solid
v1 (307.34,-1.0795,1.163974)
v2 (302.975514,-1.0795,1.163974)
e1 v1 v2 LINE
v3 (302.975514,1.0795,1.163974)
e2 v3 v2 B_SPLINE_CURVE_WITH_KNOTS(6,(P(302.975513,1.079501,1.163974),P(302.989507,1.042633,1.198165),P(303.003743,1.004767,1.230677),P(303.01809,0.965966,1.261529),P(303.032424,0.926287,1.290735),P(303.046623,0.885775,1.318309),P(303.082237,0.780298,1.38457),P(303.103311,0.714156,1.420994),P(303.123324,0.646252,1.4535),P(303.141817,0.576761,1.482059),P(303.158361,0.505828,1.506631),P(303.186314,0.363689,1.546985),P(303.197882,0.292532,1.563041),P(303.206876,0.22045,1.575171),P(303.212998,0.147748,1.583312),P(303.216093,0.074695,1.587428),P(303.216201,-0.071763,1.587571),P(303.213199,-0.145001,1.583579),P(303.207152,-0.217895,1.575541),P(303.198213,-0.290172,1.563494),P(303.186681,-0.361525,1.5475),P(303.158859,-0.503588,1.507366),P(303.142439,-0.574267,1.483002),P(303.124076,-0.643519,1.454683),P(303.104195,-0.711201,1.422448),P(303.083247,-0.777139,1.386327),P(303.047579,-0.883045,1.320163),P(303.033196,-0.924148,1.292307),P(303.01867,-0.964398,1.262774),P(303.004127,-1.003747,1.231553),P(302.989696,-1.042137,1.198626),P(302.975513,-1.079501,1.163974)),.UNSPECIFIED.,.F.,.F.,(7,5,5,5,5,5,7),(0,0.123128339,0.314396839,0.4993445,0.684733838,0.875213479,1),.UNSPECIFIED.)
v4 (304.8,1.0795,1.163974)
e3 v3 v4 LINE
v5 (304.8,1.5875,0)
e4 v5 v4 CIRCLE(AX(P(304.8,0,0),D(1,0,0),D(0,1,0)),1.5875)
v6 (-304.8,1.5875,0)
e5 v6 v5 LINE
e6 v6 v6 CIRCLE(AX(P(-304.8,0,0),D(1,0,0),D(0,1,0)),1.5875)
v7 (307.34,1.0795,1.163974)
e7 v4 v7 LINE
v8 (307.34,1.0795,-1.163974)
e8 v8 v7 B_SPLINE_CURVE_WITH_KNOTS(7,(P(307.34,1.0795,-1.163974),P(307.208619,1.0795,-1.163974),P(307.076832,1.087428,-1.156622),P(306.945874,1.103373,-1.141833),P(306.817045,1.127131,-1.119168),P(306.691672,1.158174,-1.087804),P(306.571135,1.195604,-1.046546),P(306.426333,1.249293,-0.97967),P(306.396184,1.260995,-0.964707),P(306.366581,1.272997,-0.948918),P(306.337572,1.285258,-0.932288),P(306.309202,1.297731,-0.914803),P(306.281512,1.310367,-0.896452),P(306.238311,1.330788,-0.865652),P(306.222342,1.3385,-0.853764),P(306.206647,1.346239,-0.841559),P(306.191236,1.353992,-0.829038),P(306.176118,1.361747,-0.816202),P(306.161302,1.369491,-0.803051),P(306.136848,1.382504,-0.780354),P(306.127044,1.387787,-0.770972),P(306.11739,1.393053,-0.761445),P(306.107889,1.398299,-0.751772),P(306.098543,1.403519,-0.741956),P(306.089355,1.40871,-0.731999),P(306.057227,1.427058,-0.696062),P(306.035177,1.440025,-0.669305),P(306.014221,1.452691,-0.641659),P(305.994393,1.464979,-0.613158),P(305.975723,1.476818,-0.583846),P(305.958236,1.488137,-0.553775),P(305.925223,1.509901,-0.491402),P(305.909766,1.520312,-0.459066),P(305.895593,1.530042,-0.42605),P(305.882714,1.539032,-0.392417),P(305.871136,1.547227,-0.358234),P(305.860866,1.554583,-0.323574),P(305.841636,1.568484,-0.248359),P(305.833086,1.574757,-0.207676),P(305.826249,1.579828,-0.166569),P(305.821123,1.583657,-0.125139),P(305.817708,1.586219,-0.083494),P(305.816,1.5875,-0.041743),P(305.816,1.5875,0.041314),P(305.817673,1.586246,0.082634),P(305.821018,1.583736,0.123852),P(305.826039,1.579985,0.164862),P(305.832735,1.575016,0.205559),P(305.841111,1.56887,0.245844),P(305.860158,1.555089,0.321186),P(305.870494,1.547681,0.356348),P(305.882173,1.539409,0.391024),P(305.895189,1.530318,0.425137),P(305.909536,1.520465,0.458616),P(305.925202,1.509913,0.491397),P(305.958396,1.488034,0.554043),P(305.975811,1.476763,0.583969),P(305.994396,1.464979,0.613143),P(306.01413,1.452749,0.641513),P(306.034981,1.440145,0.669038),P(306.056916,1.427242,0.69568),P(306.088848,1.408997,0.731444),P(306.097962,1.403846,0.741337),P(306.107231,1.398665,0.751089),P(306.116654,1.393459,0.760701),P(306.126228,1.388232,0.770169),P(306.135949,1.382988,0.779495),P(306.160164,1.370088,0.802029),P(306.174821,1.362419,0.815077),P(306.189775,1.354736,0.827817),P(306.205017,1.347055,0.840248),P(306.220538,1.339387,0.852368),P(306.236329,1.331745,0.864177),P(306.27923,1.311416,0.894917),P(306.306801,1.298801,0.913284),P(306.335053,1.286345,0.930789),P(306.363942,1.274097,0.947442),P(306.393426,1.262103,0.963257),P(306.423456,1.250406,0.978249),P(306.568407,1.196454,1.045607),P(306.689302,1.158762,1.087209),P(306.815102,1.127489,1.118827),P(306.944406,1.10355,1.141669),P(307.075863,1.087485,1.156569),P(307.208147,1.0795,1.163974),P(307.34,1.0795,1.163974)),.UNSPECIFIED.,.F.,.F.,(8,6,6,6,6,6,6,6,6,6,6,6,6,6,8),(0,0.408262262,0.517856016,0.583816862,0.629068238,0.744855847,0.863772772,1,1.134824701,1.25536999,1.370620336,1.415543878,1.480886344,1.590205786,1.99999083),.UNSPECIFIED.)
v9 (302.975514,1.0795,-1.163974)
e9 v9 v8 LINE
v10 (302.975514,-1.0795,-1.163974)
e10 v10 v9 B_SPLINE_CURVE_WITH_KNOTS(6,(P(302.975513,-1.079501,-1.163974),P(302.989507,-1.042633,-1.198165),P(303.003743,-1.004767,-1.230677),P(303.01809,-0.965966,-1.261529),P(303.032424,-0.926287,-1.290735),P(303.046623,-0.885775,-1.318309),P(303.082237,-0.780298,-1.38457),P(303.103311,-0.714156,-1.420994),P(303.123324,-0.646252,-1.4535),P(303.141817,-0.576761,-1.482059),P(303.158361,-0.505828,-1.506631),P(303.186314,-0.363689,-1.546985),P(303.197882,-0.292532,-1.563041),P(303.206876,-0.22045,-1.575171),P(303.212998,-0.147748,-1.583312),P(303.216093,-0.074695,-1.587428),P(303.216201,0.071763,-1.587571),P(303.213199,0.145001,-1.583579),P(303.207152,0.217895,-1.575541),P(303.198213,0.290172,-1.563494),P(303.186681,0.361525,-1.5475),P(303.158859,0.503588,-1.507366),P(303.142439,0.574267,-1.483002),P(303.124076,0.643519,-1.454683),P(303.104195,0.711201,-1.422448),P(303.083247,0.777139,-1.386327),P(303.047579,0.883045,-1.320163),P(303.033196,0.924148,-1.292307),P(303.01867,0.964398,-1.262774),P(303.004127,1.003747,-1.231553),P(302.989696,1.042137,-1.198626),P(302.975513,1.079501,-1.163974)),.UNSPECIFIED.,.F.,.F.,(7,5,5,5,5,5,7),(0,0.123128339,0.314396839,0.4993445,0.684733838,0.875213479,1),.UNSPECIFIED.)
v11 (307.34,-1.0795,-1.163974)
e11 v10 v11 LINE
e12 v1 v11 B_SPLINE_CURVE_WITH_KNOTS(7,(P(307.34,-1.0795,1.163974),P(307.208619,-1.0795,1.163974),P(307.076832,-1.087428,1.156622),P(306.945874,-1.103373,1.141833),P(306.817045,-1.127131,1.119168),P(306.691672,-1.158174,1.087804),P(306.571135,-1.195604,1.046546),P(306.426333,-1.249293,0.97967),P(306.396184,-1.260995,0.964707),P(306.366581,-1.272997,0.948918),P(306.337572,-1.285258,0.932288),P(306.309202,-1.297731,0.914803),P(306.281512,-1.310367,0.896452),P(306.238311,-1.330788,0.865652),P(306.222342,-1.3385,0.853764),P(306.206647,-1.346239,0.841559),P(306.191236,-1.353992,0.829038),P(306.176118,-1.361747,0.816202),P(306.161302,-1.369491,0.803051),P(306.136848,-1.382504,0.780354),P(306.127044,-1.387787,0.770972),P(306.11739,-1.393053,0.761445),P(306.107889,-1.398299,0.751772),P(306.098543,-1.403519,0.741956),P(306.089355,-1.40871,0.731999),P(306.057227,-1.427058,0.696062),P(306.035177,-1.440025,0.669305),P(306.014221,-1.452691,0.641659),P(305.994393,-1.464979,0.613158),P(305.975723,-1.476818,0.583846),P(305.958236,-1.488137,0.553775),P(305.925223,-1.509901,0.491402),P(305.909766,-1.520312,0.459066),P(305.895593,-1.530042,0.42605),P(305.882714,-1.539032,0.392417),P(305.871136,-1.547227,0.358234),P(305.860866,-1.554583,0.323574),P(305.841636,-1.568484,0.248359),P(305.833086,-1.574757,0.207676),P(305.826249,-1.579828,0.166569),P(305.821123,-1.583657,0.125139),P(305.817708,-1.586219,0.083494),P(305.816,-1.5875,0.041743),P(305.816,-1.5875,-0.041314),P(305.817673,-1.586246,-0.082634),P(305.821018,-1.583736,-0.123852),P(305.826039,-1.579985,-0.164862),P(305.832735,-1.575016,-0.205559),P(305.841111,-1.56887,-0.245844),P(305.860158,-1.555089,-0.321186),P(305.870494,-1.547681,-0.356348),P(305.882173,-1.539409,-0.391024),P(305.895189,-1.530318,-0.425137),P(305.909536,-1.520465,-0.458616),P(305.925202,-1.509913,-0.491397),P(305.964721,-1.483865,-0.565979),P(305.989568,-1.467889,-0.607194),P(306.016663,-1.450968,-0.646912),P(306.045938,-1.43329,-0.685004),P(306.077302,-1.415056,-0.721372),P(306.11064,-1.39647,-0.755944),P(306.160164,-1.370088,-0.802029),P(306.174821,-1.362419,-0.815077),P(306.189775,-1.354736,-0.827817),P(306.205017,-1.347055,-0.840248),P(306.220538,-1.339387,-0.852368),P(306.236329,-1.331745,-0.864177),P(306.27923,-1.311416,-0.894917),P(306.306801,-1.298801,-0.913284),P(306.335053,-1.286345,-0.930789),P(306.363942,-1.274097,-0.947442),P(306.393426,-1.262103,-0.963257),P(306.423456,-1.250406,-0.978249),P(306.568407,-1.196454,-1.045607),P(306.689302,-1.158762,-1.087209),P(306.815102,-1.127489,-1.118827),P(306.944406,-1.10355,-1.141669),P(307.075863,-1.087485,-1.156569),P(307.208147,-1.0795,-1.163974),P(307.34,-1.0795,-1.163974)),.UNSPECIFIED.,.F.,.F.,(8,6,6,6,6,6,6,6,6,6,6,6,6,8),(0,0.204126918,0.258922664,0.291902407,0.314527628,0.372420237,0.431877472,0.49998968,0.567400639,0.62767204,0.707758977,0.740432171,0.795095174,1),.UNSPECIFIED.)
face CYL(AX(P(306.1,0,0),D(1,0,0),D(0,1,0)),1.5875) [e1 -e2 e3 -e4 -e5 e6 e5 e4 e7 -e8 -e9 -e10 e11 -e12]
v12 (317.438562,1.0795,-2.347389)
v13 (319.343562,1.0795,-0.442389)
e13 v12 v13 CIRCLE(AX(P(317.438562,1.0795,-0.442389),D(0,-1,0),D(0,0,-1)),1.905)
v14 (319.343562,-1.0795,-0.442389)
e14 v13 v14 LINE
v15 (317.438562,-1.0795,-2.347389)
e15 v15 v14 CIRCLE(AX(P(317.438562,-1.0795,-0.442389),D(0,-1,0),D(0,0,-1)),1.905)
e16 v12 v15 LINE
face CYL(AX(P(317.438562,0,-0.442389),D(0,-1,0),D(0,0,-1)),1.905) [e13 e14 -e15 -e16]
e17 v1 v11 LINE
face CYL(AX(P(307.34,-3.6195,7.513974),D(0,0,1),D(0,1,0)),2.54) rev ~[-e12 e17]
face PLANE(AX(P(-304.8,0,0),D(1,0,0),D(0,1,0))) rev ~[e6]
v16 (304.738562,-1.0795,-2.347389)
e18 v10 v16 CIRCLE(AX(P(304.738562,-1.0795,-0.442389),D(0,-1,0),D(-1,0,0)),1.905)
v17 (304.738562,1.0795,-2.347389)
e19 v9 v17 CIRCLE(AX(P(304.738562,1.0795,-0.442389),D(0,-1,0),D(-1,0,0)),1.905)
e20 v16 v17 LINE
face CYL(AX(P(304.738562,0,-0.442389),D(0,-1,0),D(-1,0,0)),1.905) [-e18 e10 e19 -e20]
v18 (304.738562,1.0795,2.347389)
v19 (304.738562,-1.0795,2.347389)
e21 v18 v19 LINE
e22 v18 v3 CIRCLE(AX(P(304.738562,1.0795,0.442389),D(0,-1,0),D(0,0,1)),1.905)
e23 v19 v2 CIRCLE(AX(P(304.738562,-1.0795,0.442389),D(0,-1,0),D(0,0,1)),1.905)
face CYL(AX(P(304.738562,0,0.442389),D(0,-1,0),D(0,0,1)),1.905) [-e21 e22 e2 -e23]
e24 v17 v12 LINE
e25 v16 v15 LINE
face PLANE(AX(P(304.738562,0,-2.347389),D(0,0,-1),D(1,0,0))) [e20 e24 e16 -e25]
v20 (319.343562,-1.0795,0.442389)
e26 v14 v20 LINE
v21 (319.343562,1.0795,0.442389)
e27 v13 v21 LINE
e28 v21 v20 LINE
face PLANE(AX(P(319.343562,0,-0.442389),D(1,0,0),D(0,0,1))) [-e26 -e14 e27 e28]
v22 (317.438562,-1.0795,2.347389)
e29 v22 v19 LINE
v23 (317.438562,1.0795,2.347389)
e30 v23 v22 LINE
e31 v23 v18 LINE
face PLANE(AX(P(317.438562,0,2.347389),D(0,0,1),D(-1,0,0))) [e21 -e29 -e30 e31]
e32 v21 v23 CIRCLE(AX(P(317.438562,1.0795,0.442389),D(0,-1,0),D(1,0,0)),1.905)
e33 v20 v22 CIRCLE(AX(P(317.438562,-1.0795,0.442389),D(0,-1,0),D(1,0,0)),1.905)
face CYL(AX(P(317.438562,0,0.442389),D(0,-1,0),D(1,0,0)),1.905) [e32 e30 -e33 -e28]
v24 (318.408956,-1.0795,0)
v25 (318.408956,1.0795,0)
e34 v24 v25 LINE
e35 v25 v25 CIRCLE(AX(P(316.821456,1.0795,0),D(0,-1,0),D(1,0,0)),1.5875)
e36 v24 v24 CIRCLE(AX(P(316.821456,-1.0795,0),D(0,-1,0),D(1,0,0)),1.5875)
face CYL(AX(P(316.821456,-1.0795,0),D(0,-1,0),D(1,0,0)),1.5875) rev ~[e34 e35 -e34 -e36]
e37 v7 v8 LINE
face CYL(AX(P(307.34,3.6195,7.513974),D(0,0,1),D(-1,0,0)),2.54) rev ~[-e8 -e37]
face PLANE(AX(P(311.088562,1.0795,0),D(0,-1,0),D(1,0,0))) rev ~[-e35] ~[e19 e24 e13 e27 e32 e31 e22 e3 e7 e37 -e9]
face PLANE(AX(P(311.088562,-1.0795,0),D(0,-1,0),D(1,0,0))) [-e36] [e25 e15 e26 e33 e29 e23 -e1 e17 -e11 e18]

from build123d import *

# Parameters (mm, degrees)
F0_R         = 1.5875
F1_DEPTH     = 304.8
F3_DEPTH     = 1.0795
F4_T4_DEPTH  = 15.027948453
F4_S5_R      = 1.5875
F4_T6_DEPTH  = 9
F4_T10_DEPTH = 15.027948453
F4_S11_R     = 1.5875
F4_T12_DEPTH = 9
F5_R         = 1.5875
F6_DEPTH     = 2.6680001


# Not quite as in the source:
# - a fillet or chamfer that OpenCascade refuses, or shapes differently, is made with other operations: its cross-section is extruded or revolved along the edge and cut away or added


with BuildPart() as f1:
    # F0 (on Right) → F1 (new body, symmetric)
    with BuildSketch(Plane.YZ):
        Circle(F0_R)
    extrude(amount=F1_DEPTH, both=True)

    # F2 (on Front) → F3 (join, symmetric)
    with BuildSketch(Plane.XZ):
        with BuildLine():
            Line((304.7385620117, -2.3473887456), (317.4385620117, -2.3473887456))
            ThreePointArc((317.4385620117, -2.3473887456), (318.7856004299, -1.7894271638), (319.3435620117, -0.4423887456))
            Line((319.3435620117, -0.4423887456), (319.3435620117, 0.4423887456))
            ThreePointArc((319.3435620117, 0.4423887456), (318.7856004299, 1.7894271638), (317.4385620117, 2.3473887456))
            Line((317.4385620117, 2.3473887456), (304.7385620117, 2.3473887456))
            ThreePointArc((304.7385620117, 2.3473887456), (303.3915235936, 1.7894271638), (302.8335620117, 0.4423887456))
            Line((302.8335620117, 0.4423887456), (302.8335620117, -0.4423887456))
            ThreePointArc((302.8335620117, -0.4423887456), (303.3915235936, -1.7894271638), (304.7385620117, -2.3473887456))
        make_face()
    extrude(amount=F3_DEPTH, both=True)

    # F4: fillet of radius 2.54 on 2 edges, made by hand


with BuildPart() as f4_tool2:
    # F4_s3 → F4_t4 (new body)
    with BuildSketch(Plane.XY.offset(7.5139742265)):
        with BuildLine():
            ThreePointArc((307.34, -1.0795), (305.5439487758, -1.8234487758), (304.8, -3.6195))
            Line((304.8, -3.6195), (304.8, -1.0795))
            Line((304.8, -1.0795), (307.34, -1.0795))
        make_face()
    extrude(amount=-F4_T4_DEPTH)

    # F4_s5 → F4_t6 (intersect, symmetric)
    with BuildSketch(Plane.YZ.offset(306.1)):
        Circle(F4_S5_R)
    extrude(amount=F4_T6_DEPTH, both=True, mode=Mode.INTERSECT)


with BuildPart() as f1_1:
    add(f1.part)

    # F4_t1: union F4_tool2
    add(f4_tool2.part)


with BuildPart() as f4_tool8:
    # F4_s9 → F4_t10 (new body)
    with BuildSketch(Plane.XY.offset(7.5139742265)):
        with BuildLine():
            ThreePointArc((304.8, 3.6195), (305.5439487758, 1.8234487758), (307.34, 1.0795))
            Line((307.34, 1.0795), (304.8, 1.0795))
            Line((304.8, 1.0795), (304.8, 3.6195))
        make_face()
    extrude(amount=-F4_T10_DEPTH)

    # F4_s11 → F4_t12 (intersect, symmetric)
    with BuildSketch(Plane.YZ.offset(306.1)):
        Circle(F4_S11_R)
    extrude(amount=F4_T12_DEPTH, both=True, mode=Mode.INTERSECT)


with BuildPart() as f1_2:
    add(f1_1.part)

    # F4_t7: union F4_tool8
    add(f4_tool8.part)

    # F5 (on face) → F6 (cut, through all)
    with BuildSketch(Plane.XZ.offset(1.0795)):
        with Locations((316.8214559555, 0)):
            Circle(F5_R)
    extrude(amount=-F6_DEPTH, mode=Mode.SUBTRACT)


solid = f1_2.part
